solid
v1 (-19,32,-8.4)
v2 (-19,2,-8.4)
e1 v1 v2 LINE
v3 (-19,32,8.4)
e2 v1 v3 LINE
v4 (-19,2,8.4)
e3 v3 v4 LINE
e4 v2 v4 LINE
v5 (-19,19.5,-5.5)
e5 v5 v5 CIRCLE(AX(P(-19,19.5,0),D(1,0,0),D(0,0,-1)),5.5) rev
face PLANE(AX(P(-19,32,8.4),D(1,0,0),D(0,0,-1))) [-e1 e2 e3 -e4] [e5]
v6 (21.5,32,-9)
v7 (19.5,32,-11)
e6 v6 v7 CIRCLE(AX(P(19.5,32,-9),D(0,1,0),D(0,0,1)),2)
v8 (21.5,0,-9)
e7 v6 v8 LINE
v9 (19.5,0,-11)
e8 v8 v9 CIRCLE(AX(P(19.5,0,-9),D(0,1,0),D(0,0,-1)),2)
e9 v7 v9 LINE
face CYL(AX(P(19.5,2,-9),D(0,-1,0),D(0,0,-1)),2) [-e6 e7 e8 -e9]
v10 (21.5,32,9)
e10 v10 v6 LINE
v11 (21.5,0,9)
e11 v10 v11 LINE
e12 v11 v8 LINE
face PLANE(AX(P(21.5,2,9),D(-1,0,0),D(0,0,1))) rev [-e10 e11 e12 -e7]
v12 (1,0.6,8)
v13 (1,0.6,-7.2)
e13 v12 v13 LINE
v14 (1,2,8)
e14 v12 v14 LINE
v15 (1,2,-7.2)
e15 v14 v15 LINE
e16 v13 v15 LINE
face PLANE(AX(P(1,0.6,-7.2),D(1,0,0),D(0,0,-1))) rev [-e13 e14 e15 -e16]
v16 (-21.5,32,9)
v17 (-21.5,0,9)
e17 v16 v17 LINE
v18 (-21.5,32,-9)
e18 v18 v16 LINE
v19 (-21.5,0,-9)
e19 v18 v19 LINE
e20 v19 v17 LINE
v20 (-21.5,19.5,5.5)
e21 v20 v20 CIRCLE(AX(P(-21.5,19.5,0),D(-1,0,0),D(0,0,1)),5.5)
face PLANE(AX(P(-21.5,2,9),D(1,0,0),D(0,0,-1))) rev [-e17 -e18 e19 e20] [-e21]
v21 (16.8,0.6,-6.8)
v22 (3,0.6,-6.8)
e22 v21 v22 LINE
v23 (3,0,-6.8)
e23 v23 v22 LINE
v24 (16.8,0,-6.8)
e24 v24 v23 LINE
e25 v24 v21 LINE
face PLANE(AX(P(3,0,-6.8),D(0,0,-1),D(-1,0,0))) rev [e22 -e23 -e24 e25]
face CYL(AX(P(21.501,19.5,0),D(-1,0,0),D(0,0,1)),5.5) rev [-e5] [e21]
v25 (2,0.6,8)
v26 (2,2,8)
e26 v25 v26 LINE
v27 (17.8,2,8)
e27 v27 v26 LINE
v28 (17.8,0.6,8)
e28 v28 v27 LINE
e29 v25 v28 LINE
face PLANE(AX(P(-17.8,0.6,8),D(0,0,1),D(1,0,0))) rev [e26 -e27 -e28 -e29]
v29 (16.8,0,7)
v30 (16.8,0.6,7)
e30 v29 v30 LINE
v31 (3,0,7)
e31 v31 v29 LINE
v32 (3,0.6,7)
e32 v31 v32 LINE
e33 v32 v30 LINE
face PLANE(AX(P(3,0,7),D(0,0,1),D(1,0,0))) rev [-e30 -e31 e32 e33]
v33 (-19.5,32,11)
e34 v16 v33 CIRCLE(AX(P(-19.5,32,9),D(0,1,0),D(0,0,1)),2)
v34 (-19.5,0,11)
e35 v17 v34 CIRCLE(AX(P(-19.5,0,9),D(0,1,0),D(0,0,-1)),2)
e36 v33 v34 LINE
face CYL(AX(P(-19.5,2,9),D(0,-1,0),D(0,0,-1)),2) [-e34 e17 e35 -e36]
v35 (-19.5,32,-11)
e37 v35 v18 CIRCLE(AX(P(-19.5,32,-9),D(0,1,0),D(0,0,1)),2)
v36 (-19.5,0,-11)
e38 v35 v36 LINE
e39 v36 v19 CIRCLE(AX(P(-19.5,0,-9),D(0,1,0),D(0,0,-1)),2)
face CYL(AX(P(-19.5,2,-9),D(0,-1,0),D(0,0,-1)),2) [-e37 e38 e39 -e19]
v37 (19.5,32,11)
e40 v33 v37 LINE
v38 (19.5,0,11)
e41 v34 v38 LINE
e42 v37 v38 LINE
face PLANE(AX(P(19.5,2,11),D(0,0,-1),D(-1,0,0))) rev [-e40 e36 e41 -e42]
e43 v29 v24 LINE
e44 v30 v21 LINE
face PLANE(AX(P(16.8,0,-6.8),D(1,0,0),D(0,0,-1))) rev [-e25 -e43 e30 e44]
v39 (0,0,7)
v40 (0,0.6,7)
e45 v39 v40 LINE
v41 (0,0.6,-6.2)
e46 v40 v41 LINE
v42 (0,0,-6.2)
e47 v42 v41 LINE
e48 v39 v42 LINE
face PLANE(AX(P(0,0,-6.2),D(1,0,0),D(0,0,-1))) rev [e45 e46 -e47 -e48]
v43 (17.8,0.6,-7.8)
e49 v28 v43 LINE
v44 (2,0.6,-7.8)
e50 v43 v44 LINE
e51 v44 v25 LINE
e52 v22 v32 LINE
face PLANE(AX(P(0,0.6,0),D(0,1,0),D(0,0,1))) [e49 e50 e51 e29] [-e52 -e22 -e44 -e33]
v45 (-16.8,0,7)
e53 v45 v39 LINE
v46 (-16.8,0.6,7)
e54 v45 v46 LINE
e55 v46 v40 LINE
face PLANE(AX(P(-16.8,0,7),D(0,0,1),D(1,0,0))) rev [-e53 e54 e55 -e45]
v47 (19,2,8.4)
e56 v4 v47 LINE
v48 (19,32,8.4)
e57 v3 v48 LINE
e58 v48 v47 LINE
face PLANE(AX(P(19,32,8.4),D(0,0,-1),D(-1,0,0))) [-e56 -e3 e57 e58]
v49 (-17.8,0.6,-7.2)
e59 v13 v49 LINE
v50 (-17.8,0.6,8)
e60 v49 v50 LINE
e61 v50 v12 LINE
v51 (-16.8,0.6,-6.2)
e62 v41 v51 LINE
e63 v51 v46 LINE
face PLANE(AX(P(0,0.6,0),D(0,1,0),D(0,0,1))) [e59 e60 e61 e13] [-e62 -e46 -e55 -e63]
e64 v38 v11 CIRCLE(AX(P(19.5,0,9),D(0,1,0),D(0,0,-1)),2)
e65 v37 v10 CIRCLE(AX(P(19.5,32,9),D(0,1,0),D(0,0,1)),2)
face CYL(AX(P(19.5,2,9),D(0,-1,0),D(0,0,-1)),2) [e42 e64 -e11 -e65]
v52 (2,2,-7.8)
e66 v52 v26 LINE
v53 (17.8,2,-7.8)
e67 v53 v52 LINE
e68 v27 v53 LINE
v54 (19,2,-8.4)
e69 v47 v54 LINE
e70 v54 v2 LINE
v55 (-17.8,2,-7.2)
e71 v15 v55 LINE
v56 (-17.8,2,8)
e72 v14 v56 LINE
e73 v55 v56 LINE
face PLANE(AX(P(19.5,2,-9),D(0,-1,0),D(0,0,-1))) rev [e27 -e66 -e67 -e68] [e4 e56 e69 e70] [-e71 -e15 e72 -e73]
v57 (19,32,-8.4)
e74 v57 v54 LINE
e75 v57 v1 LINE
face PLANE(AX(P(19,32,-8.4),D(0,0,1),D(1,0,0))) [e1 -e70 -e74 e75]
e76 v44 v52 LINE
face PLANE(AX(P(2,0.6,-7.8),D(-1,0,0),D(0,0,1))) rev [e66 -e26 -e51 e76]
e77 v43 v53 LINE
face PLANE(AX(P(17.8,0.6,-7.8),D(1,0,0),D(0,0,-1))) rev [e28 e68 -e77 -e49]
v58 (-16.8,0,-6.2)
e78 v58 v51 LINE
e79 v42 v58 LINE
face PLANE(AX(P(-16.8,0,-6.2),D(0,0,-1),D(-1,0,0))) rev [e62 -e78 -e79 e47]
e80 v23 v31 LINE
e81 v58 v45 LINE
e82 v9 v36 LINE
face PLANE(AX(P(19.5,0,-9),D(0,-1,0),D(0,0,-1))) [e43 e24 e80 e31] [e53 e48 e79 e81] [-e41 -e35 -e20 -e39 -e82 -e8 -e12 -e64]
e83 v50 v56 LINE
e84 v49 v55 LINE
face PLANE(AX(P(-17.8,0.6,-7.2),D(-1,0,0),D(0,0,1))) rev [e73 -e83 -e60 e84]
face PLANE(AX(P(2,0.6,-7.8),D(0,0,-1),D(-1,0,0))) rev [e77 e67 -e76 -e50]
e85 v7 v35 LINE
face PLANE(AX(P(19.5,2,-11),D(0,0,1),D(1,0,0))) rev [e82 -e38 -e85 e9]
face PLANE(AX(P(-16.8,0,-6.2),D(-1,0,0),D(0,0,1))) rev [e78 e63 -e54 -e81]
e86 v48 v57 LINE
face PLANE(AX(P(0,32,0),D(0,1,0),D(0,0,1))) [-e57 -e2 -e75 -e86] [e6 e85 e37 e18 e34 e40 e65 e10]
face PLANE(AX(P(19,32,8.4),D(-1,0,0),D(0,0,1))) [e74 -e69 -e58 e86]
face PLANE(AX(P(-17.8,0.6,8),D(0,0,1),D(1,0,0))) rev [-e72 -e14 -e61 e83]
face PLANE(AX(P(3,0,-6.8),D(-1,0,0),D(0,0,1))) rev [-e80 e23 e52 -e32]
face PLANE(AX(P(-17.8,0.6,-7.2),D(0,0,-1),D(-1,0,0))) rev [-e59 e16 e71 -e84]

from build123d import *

# Parameters (mm, degrees)
BOSS_EXTRUDE1_DEPTH = 2
SKETCH2_W           = 18.8
SKETCH2_H           = 15.2
SKETCH2_W_2         = 15.8
SKETCH2_H_2         = 15.8
CUT_EXTRUDE1_DEPTH  = 1.4
SKETCH3_W           = 16.8
SKETCH3_H           = 13.2
SKETCH3_W_2         = 13.8
SKETCH3_H_2         = 13.8
CUT_EXTRUDE2_DEPTH  = 25.191114071
BOSS_EXTRUDE3_DEPTH = 30
FILLET1_R           = 10
SKETCH15_W          = 38
SKETCH15_H          = 16.8
CUT_EXTRUDE3_DEPTH  = 39.512984823
CUT_EXTRUDE4_REACH  = 56.717
SKETCH16_R          = 5.5


with BuildPart() as part:
    # Sketch1 → Boss-Extrude1 (new body)
    with BuildSketch(Plane(origin=(0, 0, 0), x_dir=(1, 0, 0), z_dir=(0, 1, 0))):
        with BuildLine():
            Line((19.5, -11), (-19.5, -11))
            ThreePointArc((-19.5, -11), (-20.914213562, -10.414213562), (-21.5, -9))
            Line((-21.5, -9), (-21.5, 9))
            ThreePointArc((-21.5, 9), (-20.914213562, 10.414213562), (-19.5, 11))
            Line((-19.5, 11), (19.5, 11))
            ThreePointArc((19.5, 11), (20.914213562, 10.414213562), (21.5, 9))
            Line((21.5, 9), (21.5, -9))
            ThreePointArc((21.5, -9), (20.914213562, -10.414213562), (19.5, -11))
        make_face()
    extrude(amount=BOSS_EXTRUDE1_DEPTH)

    # Sketch2 → Cut-Extrude1 (cut)
    with BuildSketch(Plane(origin=(0, 2, 0), x_dir=(1, 0, 0), z_dir=(0, 1, 0))):
        with Locations((-8.4, -0.4)):
            Rectangle(SKETCH2_W, SKETCH2_H)
        with Locations((9.9, -0.1)):
            Rectangle(SKETCH2_W_2, SKETCH2_H_2)
    extrude(amount=-CUT_EXTRUDE1_DEPTH, mode=Mode.SUBTRACT)

    # Sketch3 → Cut-Extrude2 (cut, through all)
    with BuildSketch(Plane(origin=(0, 0.6, 0), x_dir=(1, 0, 0), z_dir=(0, 1, 0))):
        with Locations((-8.4, -0.4)):
            Rectangle(SKETCH3_W, SKETCH3_H)
        with Locations((9.9, -0.1)):
            Rectangle(SKETCH3_W_2, SKETCH3_H_2)
    extrude(amount=-CUT_EXTRUDE2_DEPTH, mode=Mode.SUBTRACT)

    # Sketch13 → Boss-Extrude3 (add)
    with BuildSketch(Plane(origin=(0, 2, 0), x_dir=(1, 0, 0), z_dir=(0, 1, 0))):
        with BuildLine():
            ThreePointArc((-21.5, -9), (-20.914213562, -10.414213562), (-19.5, -11))
            Line((-19.5, -11), (19.5, -11))
            ThreePointArc((19.5, -11), (20.914213562, -10.414213562), (21.5, -9))
            Line((21.5, -9), (21.5, 9))
            ThreePointArc((21.5, 9), (20.914213562, 10.414213562), (19.5, 11))
            Line((19.5, 11), (-19.5, 11))
            ThreePointArc((-19.5, 11), (-20.914213562, 10.414213562), (-21.5, 9))
            Line((-21.5, 9), (-21.5, -9))
        make_face()
        with BuildLine():
            ThreePointArc((17.5, 8), (18.207106781, 7.707106781), (18.5, 7))
            Line((18.5, 7), (18.5, -7))
            ThreePointArc((18.5, -7), (18.306225775, -7.591607978), (17.8, -7.953939201))
            Line((17.8, -7.953939201), (17.8, -8))
            Line((17.8, -8), (-17.8, -8))
            Line((-17.8, -8), (-17.8, -7.953939201))
            ThreePointArc((-17.8, -7.953939201), (-18.306225775, -7.591607978), (-18.5, -7))
            Line((-18.5, -7), (-18.5, 7))
            ThreePointArc((-18.5, 7), (-18.207106781, 7.707106781), (-17.5, 8))
            Line((-17.5, 8), (17.5, 8))
        make_face(mode=Mode.SUBTRACT)
    extrude(amount=BOSS_EXTRUDE3_DEPTH)

    # Fillet1
    # the kernel refuses this fillet: 10 mm, written as the material it takes off along each edge
    with BuildSketch(Plane(origin=(17.8, 2, 7.953939201), x_dir=(0.906100611464274, 0, -0.42306226717123885), z_dir=(0, 1, 0))) as fillet1_piece_1:
        with BuildLine():
            CenterArc((1.580945974, -9.912835739), FILLET1_R, 97.570469618, 1.638937345)
            Line((-0.019486586, -0.041735718), (0, 0))
            ThreePointArc((0, 0), (0.131745498, -0.008716426), (0.263490996, 0))
        make_face()
    extrude(amount=30.658727489, mode=Mode.SUBTRACT)

    # Sketch15 → Cut-Extrude3 (cut, through all)
    with BuildSketch(Plane(origin=(0, 2, 0), x_dir=(1, 0, 0), z_dir=(0, 1, 0))):
        Rectangle(SKETCH15_W, SKETCH15_H)
    extrude(amount=CUT_EXTRUDE3_DEPTH, mode=Mode.SUBTRACT)

    # Sketch16 → Cut-Extrude4 (cut, up to next)
    with BuildSketch(Plane.ZY.offset(21.5), mode=Mode.PRIVATE) as cut_extrude4_sk1:
        with Locations((0, 19.5)):
            Circle(SKETCH16_R)
    cut_extrude4_tool1 = extrude(cut_extrude4_sk1.sketch, amount=-CUT_EXTRUDE4_REACH, mode=Mode.PRIVATE) & part.part
    add(cut_extrude4_tool1.solids().sort_by_distance((-21.5, 19.5, 0))[0], mode=Mode.SUBTRACT)


solid = part.part
